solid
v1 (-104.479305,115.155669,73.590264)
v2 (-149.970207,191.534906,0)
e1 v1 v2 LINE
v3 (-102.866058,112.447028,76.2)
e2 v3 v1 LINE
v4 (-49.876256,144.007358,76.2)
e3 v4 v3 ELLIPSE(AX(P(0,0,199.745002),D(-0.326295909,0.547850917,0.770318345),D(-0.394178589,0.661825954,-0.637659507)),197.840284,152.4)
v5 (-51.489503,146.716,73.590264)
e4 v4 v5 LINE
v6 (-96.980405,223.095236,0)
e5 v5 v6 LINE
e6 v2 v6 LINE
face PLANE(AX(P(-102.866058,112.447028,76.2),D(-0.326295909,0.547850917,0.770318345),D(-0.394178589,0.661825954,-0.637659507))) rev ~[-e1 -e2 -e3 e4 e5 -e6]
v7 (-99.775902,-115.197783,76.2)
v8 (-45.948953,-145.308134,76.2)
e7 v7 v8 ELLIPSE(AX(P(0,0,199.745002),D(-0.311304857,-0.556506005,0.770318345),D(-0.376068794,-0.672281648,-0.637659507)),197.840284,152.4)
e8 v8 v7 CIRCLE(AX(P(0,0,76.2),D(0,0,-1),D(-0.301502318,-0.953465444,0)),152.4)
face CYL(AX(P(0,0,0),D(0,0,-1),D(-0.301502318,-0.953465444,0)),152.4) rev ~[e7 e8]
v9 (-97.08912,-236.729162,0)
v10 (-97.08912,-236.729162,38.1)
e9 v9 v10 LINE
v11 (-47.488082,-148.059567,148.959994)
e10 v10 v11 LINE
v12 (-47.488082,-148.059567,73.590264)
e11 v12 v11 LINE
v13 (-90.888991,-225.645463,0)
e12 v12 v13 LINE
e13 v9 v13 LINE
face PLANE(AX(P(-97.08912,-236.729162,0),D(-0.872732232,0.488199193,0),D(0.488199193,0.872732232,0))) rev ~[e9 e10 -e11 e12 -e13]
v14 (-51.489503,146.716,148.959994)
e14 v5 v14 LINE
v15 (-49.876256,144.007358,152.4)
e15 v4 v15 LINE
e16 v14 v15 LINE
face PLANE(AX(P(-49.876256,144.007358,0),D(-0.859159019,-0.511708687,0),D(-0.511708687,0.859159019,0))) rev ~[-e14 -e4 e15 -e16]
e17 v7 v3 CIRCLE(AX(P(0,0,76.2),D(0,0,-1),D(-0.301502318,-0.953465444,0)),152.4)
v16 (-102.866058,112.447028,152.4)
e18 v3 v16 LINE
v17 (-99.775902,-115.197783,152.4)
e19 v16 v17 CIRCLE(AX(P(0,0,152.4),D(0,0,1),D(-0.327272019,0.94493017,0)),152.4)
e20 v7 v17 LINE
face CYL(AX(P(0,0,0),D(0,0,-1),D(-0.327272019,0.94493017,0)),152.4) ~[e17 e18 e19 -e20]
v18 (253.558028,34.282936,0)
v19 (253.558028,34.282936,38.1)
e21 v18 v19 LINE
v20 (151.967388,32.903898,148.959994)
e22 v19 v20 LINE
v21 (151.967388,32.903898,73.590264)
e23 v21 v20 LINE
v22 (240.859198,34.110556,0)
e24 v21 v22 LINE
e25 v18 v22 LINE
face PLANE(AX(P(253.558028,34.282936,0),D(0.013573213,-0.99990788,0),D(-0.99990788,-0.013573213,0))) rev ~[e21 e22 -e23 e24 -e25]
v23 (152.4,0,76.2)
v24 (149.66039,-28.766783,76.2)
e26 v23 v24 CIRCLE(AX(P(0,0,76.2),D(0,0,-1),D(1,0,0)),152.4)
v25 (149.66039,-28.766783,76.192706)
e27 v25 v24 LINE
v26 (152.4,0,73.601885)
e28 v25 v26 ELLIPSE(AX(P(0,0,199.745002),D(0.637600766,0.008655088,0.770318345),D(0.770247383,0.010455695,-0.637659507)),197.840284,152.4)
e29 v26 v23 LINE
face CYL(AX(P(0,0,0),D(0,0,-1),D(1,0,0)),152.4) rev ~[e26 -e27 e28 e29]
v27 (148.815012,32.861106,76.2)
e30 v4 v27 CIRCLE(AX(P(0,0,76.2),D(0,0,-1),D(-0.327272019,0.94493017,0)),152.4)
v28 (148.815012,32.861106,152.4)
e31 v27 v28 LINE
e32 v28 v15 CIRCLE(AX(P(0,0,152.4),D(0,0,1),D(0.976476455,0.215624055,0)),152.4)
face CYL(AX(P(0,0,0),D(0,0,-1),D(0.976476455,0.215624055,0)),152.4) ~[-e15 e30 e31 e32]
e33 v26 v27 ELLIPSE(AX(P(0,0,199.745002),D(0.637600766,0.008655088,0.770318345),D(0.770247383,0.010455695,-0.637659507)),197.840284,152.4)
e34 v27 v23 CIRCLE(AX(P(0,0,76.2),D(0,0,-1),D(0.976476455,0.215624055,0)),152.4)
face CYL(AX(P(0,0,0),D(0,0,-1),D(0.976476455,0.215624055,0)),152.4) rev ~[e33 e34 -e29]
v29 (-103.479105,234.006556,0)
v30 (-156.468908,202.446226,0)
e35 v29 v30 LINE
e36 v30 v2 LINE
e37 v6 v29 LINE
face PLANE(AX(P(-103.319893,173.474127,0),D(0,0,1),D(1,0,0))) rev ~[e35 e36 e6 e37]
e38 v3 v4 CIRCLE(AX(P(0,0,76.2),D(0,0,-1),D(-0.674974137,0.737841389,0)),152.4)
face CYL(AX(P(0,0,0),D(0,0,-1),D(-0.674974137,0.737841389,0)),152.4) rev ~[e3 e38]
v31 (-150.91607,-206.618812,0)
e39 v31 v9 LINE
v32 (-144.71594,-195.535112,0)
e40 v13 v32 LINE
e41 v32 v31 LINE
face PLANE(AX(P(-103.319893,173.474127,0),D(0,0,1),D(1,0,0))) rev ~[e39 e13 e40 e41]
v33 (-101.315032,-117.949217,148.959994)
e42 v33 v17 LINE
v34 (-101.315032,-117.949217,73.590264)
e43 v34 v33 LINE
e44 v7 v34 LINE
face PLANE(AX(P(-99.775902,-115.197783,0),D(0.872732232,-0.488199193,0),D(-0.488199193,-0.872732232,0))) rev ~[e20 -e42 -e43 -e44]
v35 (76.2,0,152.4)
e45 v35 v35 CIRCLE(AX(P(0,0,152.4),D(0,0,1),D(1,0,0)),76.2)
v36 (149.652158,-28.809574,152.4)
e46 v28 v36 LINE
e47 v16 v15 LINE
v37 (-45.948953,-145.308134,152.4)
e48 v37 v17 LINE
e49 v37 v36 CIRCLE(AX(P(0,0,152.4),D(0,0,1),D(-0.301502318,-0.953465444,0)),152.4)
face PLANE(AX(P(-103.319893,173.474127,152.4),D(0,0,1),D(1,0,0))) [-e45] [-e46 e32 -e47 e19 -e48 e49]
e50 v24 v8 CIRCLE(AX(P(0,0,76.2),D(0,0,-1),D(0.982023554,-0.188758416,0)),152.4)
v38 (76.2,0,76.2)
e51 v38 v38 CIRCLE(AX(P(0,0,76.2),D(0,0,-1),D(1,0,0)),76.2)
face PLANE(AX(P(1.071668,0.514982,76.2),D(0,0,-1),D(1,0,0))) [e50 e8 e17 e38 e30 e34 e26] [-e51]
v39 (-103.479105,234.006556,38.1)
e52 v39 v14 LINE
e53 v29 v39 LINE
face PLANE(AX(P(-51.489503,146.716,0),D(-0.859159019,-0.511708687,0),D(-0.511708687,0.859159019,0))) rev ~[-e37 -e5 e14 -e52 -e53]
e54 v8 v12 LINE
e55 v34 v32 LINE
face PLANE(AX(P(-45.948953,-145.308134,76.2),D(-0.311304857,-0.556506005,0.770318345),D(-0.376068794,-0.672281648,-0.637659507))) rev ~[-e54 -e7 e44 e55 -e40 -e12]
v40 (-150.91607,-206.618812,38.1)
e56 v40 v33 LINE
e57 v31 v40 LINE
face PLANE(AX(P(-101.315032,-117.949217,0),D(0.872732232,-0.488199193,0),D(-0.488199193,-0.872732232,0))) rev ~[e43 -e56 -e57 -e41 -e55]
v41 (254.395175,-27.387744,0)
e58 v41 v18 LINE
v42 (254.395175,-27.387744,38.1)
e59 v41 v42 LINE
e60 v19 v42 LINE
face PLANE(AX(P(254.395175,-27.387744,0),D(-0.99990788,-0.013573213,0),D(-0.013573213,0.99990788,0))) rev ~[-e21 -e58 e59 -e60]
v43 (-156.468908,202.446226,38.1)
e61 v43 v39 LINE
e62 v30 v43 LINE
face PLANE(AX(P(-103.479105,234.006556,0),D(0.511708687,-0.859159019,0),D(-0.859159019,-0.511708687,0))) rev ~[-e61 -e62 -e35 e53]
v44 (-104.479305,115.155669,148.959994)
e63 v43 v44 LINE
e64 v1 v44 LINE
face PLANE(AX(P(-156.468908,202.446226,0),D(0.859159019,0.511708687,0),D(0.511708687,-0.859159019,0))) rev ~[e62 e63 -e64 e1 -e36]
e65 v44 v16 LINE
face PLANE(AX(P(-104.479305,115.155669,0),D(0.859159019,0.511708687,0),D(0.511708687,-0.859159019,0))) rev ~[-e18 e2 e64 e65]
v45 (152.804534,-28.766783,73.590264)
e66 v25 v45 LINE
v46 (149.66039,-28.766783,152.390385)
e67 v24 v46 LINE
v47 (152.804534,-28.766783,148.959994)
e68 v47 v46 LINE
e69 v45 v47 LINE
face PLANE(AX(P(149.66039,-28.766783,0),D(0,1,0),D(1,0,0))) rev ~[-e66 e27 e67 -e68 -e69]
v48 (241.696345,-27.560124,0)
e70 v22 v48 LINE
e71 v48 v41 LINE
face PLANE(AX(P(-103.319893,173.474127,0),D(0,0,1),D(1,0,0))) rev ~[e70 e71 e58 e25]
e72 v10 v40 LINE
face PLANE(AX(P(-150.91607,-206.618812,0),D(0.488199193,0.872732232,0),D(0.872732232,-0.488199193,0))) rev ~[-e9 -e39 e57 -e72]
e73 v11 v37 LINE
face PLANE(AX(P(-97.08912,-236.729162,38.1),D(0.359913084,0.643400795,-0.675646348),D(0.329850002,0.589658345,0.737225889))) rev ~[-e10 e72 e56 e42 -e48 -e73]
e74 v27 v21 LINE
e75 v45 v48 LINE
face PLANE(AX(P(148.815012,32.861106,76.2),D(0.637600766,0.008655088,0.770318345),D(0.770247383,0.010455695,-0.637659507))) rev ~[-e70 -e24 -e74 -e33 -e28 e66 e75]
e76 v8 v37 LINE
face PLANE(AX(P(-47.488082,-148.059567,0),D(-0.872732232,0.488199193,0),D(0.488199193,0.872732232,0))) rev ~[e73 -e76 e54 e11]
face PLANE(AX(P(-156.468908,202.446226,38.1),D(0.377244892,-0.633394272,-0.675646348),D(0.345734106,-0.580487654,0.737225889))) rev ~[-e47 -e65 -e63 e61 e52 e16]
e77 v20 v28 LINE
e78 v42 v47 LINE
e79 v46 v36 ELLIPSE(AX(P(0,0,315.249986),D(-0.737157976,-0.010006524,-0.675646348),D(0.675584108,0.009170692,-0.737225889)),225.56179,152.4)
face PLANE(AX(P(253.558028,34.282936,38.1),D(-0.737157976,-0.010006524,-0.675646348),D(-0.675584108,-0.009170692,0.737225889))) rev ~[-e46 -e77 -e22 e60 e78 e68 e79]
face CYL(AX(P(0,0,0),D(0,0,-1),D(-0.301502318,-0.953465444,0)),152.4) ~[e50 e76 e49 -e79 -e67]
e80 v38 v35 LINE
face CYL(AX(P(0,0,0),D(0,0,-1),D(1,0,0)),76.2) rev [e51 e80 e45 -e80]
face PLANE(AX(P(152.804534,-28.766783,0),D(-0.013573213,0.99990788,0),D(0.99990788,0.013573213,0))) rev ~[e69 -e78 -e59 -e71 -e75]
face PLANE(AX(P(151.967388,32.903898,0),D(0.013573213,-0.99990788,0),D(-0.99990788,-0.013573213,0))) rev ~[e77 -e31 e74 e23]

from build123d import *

# Parameters (mm, degrees)
F0_R     = 76.2
F1_DEPTH = 152.4
F2_R     = 76.2
F3_DEPTH = 76.2
F5_DEPTH = 76.2
F7_DEPTH = 76.2
F9_DEPTH = 76.2


with BuildPart() as f1:
    # F0 (on Top) → F1 (new body)
    with BuildSketch(Plane.XY):
        with BuildLine():
            ThreePointArc((-102.8660584411, 112.447027621), (-77.9844038606, 130.9358344935), (-49.8762557284, 144.0073578485))
            Line((-49.8762557284, 144.0073578485), (-51.4895025042, 146.7159996073))
            Line((-51.4895025042, 146.7159996073), (-103.4791050779, 234.0065559363))
            Line((-103.4791050779, 234.0065559363), (-156.4689077906, 202.4462257088))
            Line((-156.4689077906, 202.4462257088), (-104.4793052169, 115.1556693797))
            Line((-104.4793052169, 115.1556693797), (-102.8660584411, 112.447027621))
        make_face()
        with BuildLine():
            ThreePointArc((149.6603896108, -28.7667826068), (151.7135514328, -14.4484709107), (152.4, 0))
            ThreePointArc((152.4, 0), (151.5011019534, 16.5280400202), (148.8150117204, 32.8611059867))
            ThreePointArc((148.8150117204, 32.8611059867), (74.4015570068, 133.004392089), (-49.8762557284, 144.0073578485))
            ThreePointArc((-49.8762557284, 144.0073578485), (-77.9844038606, 130.9358344935), (-102.8660584411, 112.447027621))
            ThreePointArc((-102.8660584411, 112.447027621), (-152.3859608674, -2.0685575955), (-99.7759023645, -115.1977834307))
            ThreePointArc((-99.7759023645, -115.1977834307), (-74.4015570068, -133.004392089), (-45.9489532793, -145.3081336077))
            ThreePointArc((-45.9489532793, -145.3081336077), (78.0031225642, -130.9246839608), (149.6603896108, -28.7667826068))
        make_face()
        Circle(F0_R, mode=Mode.SUBTRACT)
        with BuildLine():
            Line((-47.4880824642, -148.0595671774), (-45.9489532793, -145.3081336077))
            ThreePointArc((-45.9489532793, -145.3081336077), (-74.4015570068, -133.004392089), (-99.7759023645, -115.1977834307))
            Line((-99.7759023645, -115.1977834307), (-101.3150315494, -117.9492170005))
            Line((-101.3150315494, -117.9492170005), (-150.916069554, -206.6188117265))
            Line((-150.916069554, -206.6188117265), (-97.0891204688, -236.7291619034))
            Line((-97.0891204688, -236.7291619034), (-47.4880824642, -148.0595671774))
        make_face()
        with BuildLine():
            ThreePointArc((148.8150117204, 32.8611059867), (151.5011019534, 16.5280400202), (152.4, 0))
            ThreePointArc((152.4, 0), (151.7135514328, -14.4484709107), (149.6603896108, -28.7667826068))
            Line((149.6603896108, -28.7667826068), (152.8045340537, -28.7667826068))
            Line((152.8045340537, -28.7667826068), (254.3951746319, -27.3877442098))
            Line((254.3951746319, -27.3877442098), (253.5580282594, 34.2829361947))
            Line((253.5580282594, 34.2829361947), (151.9673876811, 32.9038977977))
            Line((151.9673876811, 32.9038977977), (148.8150117204, 32.8611059867))
        make_face()
    extrude(amount=F1_DEPTH)

    # F2 (on face) → F3 (cut)
    with BuildSketch(Plane(origin=(0, 0, 0), x_dir=(1, 0, 0), z_dir=(0, 0, -1))):
        with BuildLine():
            ThreePointArc((148.8150117204, -32.8611059867), (151.5011019534, -16.5280400202), (152.4, 0))
            ThreePointArc((152.4, 0), (151.7135514328, 14.4484709107), (149.6603896108, 28.7667826068))
            ThreePointArc((149.6603896108, 28.7667826068), (78.0031225642, 130.9246839608), (-45.9489532793, 145.3081336077))
            ThreePointArc((-45.9489532793, 145.3081336077), (-74.4015570068, 133.004392089), (-99.7759023645, 115.1977834307))
            ThreePointArc((-99.7759023645, 115.1977834307), (-152.3859608674, 2.0685575955), (-102.8660584411, -112.447027621))
            ThreePointArc((-102.8660584411, -112.447027621), (-77.9844038606, -130.9358344935), (-49.8762557284, -144.0073578485))
            ThreePointArc((-49.8762557284, -144.0073578485), (74.4015570068, -133.004392089), (148.8150117204, -32.8611059867))
        make_face()
        Circle(F2_R, mode=Mode.SUBTRACT)
        Circle(F2_R)
    extrude(amount=-F3_DEPTH, mode=Mode.SUBTRACT)

    # F4 (on face) → F5 (cut)
    with BuildSketch(Plane(origin=(-0.4185731863, 30.8353402022, 0), x_dir=(-0.9999078797, -0.0135732126, 0), z_dir=(-0.0135732126, 0.9999078797, 0))):
        Polygon((-254, 38.1), (-149.2473336147, 152.4), (-254, 152.4), align=None)
        Polygon((-149.2473336147, 0), (-149.2473336147, 76.2), (-241.3, 0), align=None)
    extrude(amount=-F5_DEPTH, mode=Mode.SUBTRACT)

    # F6 (on face) → F7 (cut)
    with BuildSketch(Plane(origin=(-26.4949013563, -15.7801651138, 0), x_dir=(0.5117086867, -0.859159019, 0), z_dir=(-0.859159019, -0.5117086867, 0))):
        Polygon((-254, 38.1), (-149.2473336147, 152.4), (-254, 152.4), align=None)
        Polygon((-149.2473336147, 0), (-149.2473336147, 76.2), (-241.3, 0), align=None)
    extrude(amount=-F7_DEPTH, mode=Mode.SUBTRACT)

    # F8 (on face) → F9 (cut)
    with BuildSketch(Plane(origin=(26.9134745426, -15.0551750885, 0), x_dir=(0.488199193, 0.8727322316, 0), z_dir=(0.8727322316, -0.488199193, 0))):
        Polygon((-254, 38.1), (-149.2473336147, 152.4), (-254, 152.4), align=None)
        Polygon((-149.2473336147, 0), (-149.2473336147, 76.2), (-241.3, 0), align=None)
    extrude(amount=-F9_DEPTH, mode=Mode.SUBTRACT)


solid = f1.part
